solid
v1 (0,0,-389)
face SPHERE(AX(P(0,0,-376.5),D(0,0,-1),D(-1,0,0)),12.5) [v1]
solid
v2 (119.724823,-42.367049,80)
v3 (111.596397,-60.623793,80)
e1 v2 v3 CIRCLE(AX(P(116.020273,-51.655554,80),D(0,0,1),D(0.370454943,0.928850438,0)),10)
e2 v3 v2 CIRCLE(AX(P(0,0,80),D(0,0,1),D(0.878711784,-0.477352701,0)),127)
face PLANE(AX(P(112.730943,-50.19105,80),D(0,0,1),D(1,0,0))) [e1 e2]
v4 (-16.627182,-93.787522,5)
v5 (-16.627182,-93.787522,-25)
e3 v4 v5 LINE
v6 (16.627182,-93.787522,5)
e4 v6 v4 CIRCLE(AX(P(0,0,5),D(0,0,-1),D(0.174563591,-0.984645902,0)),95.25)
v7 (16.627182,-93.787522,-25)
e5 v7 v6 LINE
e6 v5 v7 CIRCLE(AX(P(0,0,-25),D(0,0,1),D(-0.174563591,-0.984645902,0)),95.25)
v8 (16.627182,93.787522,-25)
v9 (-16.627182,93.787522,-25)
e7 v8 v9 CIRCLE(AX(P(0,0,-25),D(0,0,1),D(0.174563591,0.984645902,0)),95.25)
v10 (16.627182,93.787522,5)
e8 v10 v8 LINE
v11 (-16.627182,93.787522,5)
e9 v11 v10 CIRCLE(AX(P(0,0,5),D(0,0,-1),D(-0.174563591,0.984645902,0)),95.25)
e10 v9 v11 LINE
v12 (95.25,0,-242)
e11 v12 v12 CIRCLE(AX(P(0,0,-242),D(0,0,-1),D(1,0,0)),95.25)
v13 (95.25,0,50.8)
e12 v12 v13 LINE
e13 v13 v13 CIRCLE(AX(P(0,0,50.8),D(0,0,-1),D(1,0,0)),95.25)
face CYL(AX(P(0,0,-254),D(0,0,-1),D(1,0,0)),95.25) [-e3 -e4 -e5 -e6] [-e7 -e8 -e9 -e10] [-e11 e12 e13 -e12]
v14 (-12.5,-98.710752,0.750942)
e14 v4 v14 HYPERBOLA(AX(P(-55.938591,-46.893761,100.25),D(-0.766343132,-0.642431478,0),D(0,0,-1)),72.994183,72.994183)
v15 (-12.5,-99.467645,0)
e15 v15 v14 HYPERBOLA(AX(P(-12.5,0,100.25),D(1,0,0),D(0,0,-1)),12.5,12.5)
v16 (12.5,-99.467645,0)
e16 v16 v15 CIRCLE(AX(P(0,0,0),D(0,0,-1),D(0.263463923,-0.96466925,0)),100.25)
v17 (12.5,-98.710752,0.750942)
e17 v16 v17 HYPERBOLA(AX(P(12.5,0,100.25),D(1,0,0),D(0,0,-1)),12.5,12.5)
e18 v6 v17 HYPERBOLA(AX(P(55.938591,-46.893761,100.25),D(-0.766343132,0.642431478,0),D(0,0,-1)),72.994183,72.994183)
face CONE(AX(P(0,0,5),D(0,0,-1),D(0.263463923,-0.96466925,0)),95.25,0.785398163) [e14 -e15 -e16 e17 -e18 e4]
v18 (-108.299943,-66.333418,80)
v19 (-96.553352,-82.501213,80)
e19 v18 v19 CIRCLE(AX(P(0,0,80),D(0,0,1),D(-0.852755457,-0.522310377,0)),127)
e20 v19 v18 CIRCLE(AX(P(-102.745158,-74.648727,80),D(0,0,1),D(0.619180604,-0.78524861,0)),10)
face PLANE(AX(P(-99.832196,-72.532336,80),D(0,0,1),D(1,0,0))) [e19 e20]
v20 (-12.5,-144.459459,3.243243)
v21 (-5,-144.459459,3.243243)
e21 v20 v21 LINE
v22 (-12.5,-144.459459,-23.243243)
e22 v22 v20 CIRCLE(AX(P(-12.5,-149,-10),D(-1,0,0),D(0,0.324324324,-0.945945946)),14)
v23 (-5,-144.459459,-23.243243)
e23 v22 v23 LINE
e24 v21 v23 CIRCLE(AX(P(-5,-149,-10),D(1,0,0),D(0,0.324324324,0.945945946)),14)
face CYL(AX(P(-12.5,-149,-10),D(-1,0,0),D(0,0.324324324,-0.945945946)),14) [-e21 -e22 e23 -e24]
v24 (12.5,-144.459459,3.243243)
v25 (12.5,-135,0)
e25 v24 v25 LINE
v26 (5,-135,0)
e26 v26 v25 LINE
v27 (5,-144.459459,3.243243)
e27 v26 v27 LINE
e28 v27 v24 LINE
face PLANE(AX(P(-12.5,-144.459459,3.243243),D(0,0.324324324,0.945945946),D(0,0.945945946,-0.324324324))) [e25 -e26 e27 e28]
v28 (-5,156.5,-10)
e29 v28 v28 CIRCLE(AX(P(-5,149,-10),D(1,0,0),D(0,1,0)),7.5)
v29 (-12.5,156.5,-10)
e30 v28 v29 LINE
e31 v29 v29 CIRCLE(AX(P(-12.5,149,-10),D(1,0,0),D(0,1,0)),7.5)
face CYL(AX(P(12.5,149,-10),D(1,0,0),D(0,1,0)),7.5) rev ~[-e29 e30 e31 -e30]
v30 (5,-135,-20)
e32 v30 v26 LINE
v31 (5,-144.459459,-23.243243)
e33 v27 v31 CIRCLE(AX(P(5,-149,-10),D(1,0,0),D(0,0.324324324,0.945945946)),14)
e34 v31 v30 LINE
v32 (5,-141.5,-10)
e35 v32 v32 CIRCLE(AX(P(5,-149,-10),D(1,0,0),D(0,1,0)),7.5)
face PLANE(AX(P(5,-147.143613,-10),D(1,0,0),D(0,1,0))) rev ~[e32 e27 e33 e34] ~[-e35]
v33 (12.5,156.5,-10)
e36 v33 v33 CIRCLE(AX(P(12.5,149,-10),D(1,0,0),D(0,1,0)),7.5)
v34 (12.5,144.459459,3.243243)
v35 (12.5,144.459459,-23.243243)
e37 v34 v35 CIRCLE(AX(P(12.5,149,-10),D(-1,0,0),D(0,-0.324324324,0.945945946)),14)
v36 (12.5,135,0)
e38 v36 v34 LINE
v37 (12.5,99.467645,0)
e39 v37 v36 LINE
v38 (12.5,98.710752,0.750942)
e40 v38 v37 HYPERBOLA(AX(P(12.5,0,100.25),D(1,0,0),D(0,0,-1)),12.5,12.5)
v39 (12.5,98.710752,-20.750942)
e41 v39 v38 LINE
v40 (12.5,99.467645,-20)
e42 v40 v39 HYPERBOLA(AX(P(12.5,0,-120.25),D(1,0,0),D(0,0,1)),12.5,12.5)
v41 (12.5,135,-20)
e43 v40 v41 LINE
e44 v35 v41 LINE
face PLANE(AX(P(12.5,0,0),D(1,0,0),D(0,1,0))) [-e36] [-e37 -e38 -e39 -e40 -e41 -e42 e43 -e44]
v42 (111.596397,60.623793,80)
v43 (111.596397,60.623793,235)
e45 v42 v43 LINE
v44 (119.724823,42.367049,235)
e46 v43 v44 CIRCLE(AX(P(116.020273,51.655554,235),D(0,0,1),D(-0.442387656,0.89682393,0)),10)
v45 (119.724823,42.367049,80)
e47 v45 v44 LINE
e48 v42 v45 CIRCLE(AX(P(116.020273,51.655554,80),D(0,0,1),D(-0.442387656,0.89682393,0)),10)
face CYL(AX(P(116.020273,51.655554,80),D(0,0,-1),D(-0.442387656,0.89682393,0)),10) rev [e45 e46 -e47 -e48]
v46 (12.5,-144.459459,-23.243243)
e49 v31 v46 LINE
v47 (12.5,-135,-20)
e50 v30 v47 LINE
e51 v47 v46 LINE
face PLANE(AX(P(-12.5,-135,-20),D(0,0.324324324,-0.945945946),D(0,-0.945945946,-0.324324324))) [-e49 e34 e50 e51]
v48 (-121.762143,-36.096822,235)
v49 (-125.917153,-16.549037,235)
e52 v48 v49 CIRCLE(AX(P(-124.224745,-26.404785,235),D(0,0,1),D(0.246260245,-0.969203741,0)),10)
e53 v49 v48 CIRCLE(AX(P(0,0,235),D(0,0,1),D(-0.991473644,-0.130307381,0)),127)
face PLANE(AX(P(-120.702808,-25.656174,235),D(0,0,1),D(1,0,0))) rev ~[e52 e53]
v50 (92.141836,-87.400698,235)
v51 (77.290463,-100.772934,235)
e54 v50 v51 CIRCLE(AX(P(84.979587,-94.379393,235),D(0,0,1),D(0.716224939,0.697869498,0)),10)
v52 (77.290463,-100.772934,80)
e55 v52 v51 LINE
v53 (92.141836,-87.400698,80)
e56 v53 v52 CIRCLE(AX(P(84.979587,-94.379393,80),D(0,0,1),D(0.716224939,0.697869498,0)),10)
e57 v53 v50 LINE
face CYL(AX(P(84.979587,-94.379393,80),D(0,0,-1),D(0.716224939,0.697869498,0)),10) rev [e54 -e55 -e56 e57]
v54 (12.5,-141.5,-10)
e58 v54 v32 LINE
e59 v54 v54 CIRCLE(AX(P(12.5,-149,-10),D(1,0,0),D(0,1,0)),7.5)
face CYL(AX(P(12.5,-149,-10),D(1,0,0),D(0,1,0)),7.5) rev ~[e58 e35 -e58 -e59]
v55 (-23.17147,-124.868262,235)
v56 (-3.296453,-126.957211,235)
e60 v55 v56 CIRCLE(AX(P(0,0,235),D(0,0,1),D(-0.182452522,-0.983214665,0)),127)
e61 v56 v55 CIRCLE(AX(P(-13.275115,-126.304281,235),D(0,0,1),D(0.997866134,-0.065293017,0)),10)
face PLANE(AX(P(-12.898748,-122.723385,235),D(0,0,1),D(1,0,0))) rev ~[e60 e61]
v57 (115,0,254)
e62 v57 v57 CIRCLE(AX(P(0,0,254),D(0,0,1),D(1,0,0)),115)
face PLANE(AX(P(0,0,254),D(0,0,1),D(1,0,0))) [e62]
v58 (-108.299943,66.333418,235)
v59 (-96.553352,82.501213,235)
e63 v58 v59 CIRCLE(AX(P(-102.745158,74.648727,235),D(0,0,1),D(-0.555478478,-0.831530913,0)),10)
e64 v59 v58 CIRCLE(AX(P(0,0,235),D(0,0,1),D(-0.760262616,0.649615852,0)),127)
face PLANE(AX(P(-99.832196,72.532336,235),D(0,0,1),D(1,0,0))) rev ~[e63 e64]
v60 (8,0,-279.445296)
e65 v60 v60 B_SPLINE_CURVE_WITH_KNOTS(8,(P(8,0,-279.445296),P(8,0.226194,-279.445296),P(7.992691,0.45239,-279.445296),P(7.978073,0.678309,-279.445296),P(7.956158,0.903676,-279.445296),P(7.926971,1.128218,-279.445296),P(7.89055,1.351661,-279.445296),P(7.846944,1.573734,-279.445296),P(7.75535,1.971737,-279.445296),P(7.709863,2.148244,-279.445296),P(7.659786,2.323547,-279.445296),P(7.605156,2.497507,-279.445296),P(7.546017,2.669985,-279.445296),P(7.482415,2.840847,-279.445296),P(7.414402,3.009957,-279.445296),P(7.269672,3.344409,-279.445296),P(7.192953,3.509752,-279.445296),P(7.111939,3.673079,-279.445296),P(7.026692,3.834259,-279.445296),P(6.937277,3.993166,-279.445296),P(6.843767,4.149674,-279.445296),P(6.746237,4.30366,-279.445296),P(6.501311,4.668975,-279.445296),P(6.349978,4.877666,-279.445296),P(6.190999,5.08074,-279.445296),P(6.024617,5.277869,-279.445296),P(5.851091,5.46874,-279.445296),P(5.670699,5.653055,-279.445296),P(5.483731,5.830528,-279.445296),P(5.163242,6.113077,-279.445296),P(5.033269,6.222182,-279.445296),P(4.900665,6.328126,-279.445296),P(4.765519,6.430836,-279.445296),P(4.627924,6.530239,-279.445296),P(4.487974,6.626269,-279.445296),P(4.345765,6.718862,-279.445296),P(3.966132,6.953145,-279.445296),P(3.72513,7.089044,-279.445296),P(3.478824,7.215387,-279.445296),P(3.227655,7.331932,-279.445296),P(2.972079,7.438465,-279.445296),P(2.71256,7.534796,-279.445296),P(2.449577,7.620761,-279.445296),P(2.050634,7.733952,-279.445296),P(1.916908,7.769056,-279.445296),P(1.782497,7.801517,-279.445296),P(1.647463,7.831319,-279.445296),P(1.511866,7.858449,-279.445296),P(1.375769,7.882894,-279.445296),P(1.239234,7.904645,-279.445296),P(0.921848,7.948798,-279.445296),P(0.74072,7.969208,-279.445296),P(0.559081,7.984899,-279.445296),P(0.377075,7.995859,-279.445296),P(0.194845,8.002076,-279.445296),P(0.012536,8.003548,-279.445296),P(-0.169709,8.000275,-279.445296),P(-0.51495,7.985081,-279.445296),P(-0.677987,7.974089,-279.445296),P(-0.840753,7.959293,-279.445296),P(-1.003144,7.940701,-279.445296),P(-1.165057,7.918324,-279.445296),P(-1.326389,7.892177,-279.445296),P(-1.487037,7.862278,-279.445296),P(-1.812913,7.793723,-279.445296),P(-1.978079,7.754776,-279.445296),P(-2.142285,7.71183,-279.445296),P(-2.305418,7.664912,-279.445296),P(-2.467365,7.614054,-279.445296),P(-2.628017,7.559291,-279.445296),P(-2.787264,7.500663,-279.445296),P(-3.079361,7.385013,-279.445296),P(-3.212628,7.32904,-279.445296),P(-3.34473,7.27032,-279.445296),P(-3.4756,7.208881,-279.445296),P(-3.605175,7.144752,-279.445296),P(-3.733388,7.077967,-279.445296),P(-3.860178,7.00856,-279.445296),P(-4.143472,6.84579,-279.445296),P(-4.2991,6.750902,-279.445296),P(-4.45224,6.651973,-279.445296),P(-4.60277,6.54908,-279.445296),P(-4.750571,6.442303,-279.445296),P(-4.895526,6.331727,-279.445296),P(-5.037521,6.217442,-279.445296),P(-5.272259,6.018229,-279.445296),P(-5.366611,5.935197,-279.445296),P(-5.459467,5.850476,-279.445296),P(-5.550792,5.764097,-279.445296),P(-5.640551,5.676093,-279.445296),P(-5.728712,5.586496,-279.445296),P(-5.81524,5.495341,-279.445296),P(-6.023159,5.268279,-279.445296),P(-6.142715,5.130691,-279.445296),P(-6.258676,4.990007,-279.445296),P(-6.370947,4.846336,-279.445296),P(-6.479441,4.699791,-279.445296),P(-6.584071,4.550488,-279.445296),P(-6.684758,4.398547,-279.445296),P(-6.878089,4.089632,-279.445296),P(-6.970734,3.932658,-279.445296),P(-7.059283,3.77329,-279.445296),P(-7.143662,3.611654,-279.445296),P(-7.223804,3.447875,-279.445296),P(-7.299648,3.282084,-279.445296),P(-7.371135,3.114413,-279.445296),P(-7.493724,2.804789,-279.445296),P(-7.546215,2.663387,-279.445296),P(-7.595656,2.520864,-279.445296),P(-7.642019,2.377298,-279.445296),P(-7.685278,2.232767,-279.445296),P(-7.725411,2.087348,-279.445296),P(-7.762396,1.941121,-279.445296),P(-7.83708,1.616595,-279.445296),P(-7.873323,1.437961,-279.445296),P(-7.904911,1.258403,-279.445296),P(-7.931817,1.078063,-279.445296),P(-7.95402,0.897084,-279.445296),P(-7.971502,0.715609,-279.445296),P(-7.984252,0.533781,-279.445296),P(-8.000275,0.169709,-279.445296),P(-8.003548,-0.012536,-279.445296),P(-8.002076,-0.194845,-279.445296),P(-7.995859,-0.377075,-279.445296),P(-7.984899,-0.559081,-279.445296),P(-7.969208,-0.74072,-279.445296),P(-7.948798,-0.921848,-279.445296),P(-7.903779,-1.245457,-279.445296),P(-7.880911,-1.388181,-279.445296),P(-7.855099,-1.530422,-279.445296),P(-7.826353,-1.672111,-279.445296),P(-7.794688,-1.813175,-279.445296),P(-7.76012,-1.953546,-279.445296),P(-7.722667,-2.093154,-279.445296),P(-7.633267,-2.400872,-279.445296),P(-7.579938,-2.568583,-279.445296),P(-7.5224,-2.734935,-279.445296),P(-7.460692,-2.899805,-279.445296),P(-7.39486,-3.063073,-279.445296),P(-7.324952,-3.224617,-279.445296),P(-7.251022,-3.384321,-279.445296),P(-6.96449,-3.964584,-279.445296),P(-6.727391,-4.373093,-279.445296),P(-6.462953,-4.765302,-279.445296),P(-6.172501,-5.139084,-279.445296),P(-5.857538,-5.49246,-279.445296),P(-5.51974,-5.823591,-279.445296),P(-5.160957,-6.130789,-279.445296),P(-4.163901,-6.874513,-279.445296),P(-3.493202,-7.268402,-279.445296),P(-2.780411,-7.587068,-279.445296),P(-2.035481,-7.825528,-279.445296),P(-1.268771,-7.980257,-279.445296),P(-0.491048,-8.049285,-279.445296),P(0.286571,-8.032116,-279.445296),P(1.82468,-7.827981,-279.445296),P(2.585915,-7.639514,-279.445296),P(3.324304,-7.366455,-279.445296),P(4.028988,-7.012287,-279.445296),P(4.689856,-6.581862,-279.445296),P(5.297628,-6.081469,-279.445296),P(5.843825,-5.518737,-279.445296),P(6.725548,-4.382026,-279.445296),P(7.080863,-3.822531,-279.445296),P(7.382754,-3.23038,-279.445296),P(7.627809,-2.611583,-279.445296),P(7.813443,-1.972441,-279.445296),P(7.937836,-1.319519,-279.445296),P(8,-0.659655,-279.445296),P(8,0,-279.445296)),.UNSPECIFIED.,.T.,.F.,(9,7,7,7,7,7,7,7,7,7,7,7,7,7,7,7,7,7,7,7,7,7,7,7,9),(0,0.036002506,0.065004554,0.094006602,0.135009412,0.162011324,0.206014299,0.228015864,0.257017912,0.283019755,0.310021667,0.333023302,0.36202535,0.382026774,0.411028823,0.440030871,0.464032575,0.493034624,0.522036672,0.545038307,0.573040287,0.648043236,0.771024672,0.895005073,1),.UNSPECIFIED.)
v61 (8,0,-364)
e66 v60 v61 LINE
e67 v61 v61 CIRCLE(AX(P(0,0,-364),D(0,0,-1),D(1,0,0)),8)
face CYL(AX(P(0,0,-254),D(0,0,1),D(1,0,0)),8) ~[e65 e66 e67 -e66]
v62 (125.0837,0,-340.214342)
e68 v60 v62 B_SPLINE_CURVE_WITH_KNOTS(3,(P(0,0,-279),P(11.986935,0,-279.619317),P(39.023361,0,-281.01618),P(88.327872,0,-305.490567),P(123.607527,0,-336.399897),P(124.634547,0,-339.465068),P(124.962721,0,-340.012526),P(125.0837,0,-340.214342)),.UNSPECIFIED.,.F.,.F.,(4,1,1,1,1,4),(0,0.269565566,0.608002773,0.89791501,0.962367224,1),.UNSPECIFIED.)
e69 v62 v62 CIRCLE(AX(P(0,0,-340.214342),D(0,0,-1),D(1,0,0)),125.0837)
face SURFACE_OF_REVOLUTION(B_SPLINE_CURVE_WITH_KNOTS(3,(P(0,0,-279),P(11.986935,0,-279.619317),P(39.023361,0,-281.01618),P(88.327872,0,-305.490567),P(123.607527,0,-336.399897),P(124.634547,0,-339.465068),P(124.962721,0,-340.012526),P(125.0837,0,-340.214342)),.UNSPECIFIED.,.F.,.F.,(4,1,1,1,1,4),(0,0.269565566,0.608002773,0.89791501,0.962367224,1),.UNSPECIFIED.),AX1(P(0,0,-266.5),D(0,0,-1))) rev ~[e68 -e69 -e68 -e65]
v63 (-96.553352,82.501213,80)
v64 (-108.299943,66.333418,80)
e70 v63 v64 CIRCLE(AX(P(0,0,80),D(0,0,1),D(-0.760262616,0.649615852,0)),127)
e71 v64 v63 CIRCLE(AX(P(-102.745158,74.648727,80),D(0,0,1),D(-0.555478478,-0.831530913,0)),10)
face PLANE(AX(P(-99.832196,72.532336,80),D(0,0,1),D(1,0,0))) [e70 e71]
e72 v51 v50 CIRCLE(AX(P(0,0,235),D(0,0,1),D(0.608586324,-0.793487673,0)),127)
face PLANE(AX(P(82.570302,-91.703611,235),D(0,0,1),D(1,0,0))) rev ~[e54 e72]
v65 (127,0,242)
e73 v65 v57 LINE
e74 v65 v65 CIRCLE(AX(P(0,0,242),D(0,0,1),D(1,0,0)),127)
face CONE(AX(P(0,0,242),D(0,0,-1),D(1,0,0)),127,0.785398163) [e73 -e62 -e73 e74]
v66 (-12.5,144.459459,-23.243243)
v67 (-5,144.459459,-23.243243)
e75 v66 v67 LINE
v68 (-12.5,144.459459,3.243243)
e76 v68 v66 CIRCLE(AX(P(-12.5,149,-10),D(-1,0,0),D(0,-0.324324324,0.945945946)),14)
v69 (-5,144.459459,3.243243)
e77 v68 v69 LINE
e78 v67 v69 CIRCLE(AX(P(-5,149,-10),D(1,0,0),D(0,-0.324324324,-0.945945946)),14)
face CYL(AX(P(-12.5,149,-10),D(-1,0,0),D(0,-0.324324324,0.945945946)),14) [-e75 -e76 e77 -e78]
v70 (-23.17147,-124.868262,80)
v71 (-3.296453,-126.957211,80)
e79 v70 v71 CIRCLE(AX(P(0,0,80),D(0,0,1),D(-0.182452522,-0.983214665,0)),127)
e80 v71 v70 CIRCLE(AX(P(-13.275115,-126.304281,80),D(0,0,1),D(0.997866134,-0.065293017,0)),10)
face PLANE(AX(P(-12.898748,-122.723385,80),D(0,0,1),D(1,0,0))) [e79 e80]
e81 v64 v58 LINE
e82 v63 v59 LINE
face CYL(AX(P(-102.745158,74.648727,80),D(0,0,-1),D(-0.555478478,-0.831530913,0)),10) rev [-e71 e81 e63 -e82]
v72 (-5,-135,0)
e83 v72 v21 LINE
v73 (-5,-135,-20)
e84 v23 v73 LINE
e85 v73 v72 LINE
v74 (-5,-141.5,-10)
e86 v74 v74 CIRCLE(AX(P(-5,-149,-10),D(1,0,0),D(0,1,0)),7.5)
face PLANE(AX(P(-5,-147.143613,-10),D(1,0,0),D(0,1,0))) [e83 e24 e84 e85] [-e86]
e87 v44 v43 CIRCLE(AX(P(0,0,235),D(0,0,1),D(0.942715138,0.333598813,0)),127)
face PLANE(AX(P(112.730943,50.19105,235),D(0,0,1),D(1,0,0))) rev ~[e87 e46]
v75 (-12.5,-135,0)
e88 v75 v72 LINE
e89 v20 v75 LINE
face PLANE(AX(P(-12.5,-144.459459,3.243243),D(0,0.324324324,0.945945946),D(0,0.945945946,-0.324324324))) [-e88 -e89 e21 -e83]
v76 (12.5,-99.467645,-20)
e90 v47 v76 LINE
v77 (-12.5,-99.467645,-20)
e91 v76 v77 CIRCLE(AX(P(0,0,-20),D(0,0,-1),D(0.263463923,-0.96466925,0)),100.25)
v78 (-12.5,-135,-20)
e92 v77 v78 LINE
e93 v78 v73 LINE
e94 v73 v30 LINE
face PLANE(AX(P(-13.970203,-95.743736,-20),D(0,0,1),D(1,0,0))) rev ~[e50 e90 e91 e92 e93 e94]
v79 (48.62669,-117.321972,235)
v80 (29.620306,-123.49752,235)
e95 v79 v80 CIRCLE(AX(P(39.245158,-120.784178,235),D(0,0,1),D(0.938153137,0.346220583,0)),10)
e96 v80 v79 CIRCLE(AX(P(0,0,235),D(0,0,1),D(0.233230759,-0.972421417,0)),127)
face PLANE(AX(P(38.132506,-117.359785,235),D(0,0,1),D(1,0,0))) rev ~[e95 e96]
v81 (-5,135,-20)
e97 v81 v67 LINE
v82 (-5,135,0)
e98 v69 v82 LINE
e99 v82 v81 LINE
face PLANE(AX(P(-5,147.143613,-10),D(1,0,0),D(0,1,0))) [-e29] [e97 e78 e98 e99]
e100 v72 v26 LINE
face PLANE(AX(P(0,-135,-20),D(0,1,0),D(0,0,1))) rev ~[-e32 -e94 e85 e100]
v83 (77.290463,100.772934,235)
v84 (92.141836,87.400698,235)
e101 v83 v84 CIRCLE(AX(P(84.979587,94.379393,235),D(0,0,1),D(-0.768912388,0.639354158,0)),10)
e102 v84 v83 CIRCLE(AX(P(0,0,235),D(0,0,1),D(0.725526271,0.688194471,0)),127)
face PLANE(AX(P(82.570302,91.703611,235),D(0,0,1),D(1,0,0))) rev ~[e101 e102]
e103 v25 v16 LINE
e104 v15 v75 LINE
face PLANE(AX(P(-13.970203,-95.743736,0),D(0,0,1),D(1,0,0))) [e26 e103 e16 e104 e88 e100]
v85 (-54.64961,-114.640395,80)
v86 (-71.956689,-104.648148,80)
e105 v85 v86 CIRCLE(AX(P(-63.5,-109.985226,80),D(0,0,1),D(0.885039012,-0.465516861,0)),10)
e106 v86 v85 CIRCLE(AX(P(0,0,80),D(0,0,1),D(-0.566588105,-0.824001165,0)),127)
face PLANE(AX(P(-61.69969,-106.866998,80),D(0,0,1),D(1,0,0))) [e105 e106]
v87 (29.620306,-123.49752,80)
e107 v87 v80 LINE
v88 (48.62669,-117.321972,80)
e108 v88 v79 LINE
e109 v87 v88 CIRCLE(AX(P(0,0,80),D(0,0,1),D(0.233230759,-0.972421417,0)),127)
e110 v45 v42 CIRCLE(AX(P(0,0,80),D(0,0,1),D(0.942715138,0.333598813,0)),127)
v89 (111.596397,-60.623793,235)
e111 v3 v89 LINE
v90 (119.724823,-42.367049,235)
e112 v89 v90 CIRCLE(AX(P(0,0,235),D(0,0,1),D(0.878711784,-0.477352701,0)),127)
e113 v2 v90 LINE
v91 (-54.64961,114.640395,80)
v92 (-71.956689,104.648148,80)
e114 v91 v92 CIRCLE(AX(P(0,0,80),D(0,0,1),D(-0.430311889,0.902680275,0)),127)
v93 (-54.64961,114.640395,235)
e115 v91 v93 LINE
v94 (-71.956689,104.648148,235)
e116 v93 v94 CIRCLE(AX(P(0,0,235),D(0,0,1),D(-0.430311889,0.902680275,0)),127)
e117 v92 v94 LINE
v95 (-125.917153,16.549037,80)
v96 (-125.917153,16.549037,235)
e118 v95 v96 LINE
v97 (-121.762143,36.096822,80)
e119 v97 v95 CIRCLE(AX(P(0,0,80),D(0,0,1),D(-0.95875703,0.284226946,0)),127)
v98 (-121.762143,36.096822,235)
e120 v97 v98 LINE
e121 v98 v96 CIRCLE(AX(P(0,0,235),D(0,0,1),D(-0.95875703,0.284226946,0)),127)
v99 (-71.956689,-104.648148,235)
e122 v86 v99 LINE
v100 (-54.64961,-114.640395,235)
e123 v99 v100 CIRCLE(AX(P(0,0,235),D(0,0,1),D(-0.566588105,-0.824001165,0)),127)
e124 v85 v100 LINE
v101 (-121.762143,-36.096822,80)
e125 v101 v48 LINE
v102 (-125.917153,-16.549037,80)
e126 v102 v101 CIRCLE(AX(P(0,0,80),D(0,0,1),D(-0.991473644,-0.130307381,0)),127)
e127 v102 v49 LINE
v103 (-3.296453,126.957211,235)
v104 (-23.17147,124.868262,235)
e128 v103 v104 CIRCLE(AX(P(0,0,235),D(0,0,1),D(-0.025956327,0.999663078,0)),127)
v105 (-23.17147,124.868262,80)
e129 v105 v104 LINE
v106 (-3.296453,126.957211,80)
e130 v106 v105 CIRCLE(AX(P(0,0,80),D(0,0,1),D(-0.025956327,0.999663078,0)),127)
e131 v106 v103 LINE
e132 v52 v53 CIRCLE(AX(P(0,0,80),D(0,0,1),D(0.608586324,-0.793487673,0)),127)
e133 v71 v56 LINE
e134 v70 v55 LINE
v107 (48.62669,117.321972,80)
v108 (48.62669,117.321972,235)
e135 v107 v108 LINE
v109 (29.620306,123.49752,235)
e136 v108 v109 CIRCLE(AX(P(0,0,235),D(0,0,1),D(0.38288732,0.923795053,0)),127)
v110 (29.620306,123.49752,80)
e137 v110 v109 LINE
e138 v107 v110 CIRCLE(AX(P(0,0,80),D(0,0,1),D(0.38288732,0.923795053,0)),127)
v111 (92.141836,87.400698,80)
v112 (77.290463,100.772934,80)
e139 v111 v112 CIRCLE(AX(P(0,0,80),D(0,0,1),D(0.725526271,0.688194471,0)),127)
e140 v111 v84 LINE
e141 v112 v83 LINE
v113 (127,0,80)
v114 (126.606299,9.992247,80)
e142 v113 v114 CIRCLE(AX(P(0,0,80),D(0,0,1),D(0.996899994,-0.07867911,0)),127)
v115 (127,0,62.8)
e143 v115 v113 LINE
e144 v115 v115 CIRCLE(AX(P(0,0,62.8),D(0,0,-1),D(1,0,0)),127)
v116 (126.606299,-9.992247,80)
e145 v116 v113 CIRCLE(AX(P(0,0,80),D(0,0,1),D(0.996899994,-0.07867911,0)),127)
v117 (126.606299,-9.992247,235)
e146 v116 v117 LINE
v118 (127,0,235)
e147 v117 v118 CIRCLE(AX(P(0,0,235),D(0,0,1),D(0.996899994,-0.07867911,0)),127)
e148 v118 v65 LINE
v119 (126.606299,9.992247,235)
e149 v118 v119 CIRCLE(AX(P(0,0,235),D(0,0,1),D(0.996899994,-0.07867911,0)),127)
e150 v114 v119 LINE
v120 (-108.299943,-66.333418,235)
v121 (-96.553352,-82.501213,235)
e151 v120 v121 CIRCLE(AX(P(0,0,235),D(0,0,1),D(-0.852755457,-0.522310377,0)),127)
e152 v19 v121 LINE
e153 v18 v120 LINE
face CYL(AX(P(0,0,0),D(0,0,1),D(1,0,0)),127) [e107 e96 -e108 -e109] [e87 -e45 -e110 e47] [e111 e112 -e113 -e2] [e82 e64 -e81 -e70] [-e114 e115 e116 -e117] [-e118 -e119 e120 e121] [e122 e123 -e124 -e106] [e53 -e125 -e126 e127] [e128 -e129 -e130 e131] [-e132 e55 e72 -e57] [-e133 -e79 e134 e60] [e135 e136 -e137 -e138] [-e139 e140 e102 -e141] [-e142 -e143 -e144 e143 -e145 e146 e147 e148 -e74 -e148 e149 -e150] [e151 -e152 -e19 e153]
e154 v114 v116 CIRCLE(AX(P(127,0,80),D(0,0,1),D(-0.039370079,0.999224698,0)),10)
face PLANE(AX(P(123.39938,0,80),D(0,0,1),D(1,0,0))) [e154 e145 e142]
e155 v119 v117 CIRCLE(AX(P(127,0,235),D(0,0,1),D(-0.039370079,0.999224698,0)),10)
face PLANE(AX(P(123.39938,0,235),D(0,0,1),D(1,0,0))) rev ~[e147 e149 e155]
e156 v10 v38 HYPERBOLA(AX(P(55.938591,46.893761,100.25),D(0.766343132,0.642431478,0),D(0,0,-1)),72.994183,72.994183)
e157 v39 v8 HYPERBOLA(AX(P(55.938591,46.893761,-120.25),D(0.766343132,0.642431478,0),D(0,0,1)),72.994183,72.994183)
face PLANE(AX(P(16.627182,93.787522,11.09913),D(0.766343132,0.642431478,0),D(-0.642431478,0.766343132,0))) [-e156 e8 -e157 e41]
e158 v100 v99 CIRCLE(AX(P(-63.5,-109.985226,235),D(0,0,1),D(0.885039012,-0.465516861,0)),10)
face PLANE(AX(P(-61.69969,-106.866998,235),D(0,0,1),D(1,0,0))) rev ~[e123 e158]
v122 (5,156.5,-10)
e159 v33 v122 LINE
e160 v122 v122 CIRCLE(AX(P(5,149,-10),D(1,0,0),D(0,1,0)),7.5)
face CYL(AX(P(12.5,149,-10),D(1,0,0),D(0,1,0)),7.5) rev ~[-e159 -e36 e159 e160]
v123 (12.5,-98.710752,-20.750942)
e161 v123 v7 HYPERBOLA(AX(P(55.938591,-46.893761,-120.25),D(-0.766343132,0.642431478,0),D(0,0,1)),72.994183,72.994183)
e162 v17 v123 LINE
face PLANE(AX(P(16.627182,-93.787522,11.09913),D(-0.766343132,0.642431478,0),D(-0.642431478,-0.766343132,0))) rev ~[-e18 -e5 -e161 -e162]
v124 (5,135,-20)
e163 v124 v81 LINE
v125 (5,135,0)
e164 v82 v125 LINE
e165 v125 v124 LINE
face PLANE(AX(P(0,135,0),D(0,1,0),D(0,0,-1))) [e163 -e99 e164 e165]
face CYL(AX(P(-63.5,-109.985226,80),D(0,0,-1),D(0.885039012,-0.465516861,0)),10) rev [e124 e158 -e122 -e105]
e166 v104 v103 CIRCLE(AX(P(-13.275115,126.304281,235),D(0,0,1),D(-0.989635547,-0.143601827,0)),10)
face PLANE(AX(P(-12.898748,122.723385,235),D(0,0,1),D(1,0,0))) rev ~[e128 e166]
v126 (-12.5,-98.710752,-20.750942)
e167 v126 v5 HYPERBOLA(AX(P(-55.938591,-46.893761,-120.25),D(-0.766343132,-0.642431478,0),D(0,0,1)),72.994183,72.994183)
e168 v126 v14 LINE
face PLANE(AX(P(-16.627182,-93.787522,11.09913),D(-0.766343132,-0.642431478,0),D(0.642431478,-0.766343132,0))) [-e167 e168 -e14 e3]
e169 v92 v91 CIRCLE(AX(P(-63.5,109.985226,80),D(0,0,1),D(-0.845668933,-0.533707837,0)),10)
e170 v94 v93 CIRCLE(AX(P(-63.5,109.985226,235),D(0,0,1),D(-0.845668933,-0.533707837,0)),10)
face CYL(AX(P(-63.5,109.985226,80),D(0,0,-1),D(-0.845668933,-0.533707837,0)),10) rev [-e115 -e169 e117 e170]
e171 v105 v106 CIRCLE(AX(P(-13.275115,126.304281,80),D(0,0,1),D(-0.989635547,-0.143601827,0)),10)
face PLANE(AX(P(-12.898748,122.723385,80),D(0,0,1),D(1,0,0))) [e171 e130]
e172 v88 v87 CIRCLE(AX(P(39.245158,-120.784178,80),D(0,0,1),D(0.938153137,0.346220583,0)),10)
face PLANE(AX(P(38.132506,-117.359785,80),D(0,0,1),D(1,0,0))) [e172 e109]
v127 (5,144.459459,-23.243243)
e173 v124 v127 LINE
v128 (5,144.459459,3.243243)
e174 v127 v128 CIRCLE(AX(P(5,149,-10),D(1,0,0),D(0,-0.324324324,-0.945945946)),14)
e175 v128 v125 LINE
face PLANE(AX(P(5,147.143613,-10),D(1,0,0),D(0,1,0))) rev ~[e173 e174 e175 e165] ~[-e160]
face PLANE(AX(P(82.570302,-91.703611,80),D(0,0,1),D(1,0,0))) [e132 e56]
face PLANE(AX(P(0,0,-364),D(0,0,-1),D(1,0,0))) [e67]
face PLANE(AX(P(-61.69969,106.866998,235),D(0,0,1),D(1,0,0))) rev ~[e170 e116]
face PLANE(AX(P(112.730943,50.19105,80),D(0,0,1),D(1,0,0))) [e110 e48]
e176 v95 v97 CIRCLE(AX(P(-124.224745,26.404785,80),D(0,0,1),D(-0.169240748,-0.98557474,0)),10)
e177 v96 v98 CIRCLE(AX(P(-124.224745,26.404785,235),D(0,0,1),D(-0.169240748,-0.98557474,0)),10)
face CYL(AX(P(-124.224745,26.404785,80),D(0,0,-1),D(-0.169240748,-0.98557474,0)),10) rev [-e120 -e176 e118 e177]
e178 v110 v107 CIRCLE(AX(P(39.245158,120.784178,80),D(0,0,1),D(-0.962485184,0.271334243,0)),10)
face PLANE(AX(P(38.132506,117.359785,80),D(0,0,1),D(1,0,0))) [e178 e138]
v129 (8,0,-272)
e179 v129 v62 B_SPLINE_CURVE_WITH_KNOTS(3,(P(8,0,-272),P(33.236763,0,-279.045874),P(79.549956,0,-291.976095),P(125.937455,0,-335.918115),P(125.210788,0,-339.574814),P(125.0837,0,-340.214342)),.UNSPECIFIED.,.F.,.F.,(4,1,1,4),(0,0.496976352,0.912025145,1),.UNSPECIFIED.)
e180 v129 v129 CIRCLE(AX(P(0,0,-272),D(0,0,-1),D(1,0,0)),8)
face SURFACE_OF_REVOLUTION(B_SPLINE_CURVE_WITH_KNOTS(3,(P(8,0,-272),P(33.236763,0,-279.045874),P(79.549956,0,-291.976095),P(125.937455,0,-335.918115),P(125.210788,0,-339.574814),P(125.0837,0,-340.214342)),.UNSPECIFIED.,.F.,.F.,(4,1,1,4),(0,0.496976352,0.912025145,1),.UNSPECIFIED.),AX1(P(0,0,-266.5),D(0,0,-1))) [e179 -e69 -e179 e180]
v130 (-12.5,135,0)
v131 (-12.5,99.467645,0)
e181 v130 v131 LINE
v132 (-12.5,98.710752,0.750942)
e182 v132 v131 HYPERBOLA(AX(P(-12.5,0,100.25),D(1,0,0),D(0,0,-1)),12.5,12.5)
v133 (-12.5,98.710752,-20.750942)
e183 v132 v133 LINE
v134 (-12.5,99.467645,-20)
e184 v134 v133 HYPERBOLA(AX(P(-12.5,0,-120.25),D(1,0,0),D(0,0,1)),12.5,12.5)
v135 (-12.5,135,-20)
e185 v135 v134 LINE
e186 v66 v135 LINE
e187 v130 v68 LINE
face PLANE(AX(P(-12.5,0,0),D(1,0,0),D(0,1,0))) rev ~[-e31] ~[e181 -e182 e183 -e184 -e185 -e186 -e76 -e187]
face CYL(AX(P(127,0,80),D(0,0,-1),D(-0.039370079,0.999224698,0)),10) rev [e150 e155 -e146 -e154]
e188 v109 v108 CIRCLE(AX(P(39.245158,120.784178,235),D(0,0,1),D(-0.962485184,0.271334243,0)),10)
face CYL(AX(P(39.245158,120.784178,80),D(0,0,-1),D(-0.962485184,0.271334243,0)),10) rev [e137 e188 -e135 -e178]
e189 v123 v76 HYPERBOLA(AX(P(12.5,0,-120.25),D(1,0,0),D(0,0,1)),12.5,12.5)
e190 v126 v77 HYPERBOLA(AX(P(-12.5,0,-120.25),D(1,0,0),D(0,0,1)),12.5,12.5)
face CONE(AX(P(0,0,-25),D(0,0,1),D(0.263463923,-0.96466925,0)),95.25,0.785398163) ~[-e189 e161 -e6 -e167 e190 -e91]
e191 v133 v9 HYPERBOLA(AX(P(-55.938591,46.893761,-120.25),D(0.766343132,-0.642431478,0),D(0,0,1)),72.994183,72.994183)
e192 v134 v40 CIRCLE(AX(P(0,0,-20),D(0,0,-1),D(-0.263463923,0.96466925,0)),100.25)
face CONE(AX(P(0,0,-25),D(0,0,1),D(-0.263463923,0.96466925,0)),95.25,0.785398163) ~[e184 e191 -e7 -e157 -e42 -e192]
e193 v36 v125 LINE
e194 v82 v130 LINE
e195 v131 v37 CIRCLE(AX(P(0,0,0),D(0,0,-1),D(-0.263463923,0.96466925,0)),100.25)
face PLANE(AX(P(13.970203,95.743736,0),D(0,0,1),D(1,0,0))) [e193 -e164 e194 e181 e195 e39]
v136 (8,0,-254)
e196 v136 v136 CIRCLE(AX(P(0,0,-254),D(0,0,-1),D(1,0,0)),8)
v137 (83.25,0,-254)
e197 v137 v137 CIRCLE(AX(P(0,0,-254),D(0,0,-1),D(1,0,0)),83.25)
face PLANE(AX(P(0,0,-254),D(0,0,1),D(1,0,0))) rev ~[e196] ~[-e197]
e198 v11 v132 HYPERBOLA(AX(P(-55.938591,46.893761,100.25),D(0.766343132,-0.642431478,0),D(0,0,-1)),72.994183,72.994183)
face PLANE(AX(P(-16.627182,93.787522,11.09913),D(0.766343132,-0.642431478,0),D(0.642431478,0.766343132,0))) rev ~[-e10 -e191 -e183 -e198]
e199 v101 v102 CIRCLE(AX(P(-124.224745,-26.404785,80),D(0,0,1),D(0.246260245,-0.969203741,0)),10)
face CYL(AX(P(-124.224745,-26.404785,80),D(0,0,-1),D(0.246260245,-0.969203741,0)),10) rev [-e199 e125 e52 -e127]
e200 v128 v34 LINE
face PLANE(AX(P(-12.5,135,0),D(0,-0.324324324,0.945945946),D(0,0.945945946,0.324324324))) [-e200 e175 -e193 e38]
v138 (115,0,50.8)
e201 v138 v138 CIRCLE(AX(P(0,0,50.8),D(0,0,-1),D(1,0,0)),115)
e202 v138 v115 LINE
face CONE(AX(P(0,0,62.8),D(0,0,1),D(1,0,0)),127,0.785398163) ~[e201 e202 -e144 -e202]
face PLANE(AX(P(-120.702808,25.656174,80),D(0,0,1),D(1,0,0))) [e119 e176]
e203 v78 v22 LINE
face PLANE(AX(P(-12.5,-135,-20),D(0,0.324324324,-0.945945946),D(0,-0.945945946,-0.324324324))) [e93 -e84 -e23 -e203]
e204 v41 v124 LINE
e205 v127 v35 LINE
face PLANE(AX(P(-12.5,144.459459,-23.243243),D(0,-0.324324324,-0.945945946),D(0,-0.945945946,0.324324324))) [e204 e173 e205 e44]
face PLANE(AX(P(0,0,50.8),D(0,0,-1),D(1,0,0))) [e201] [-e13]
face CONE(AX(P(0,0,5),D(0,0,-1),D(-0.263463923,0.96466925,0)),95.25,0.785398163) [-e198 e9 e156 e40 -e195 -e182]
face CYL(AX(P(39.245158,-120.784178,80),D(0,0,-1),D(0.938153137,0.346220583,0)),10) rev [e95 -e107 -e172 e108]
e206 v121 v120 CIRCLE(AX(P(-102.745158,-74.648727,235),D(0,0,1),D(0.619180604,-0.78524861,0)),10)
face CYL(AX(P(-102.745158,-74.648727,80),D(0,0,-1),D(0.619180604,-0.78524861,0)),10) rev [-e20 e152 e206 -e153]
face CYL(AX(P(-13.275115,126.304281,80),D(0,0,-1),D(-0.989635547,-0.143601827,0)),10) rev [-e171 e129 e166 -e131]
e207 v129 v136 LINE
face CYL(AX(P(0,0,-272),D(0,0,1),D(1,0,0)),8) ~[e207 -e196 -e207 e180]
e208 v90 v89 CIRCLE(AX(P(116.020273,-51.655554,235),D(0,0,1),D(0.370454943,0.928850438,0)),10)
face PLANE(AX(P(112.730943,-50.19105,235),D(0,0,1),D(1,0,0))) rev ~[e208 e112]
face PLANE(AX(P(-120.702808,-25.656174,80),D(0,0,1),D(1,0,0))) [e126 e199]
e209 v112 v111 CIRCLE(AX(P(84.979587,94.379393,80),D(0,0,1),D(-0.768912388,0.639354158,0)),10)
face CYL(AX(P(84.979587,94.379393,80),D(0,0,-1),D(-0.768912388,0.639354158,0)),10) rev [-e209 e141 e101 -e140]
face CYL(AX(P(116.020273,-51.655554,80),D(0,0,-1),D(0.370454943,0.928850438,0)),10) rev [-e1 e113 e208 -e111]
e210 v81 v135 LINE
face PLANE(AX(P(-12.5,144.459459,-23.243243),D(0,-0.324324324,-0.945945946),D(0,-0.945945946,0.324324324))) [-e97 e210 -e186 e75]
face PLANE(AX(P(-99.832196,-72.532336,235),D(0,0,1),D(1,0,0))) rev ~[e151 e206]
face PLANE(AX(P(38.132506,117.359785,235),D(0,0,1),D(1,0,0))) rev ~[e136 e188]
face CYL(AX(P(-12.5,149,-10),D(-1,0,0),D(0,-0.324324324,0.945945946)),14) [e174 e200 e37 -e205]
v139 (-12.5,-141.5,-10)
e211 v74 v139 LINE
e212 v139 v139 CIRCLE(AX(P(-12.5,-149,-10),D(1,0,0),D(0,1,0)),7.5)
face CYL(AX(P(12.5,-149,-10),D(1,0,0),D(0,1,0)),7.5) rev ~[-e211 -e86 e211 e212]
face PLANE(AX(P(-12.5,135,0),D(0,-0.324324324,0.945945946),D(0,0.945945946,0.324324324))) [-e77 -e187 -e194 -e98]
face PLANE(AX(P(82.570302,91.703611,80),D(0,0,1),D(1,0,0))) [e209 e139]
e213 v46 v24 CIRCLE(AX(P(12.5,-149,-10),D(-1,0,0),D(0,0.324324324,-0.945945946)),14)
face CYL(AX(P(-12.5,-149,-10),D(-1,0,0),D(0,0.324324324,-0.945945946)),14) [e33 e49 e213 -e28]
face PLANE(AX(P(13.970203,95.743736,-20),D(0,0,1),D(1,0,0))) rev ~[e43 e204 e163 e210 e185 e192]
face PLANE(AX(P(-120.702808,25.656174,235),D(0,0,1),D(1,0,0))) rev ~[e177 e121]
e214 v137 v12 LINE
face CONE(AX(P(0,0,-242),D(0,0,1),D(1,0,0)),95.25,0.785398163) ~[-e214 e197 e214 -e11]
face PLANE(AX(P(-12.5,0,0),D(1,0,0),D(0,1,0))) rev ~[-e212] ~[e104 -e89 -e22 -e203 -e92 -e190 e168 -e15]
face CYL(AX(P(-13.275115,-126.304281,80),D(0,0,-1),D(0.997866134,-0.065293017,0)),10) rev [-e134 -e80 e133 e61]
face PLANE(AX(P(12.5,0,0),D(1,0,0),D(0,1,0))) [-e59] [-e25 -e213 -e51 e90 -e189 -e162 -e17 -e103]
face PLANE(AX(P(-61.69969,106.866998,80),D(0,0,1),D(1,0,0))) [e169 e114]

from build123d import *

# Parameters (mm, degrees)
F0_R           = 127
F1_DEPTH       = 254
F2_R           = 127
F2_R_2         = 95.25
F3_DEPTH       = 304.8
F6_R           = 8
F7_DEPTH       = 110
F10_SIZE       = 12
F13_DEPTH      = 155
F15_DEPTH      = 20
F17_DEPTH      = 25
F18_T1_DEPTH   = 20
F18_T6_ANGLE   = 30.5513976385
F18_T12_ANGLE  = 30.5513976385
F18_T18_ANGLE  = 30.5513976385
F18_T24_ANGLE  = 30.5513976385
F18_T31_ANGLE  = 30.5513976385
F18_T35_DEPTH  = 31.0991303205
F18_T42_DEPTH  = 31.0991303205
F18_T46_ANGLE  = 30.5513976385
F18_T53_DEPTH  = 31.0991303205
F18_T57_ANGLE  = 30.5513976385
F18_T64_DEPTH  = 31.0991303205
F18_T68_ANGLE  = 30.5513976385
F18_T75_ANGLE  = 30.5513976385
F18_T79_DEPTH  = 31.0991303205
F18_T86_DEPTH  = 31.0991303205
F18_T90_ANGLE  = 30.5513976385
F18_T97_DEPTH  = 31.0991303205
F18_T101_ANGLE = 30.5513976385
F18_T108_DEPTH = 31.0991303205
F18_T112_ANGLE = 30.5513976385
F19_R          = 7.5
F20_DEPTH      = 25
F23_DEPTH      = 5


# Not quite as in the source:
# - a fillet or chamfer that OpenCascade refuses, or shapes differently, is made with other operations: its cross-section is extruded or revolved along the edge and cut away or added


with BuildPart() as f1:
    # F0 (on Top) → F1 (new body, symmetric)
    with BuildSketch(Plane.XY):
        Circle(F0_R)
    extrude(amount=F1_DEPTH, both=True)

    # F2 (on face) → F3 (cut)
    with BuildSketch(Plane(origin=(0, 0, -254), x_dir=(1, 0, 0), z_dir=(0, 0, -1))):
        Circle(F2_R)
        Circle(F2_R_2, mode=Mode.SUBTRACT)
    extrude(amount=-F3_DEPTH, mode=Mode.SUBTRACT)

    # F4 (on Front) → F5 (revolve)
    with BuildSketch(Plane.XZ):
        with BuildLine():
            Line((8, -272), (8, -254))
            Line((8, -254), (0, -254))
            Line((0, -254), (0, -279))
            add(Edge.make_bspline(
                [(0, -279), (11.9869346113, -279.619316661), (39.0233605765, -281.0161799623), (88.3278716399, -305.4905672545), (123.6075273001, -336.3998966271), (124.6345471897, -339.4650682793), (124.962721218, -340.0125261312), (125.0836998224, -340.2143418789)],
                knots=[0, 0, 0, 0, 0.2695655664, 0.6080027726, 0.8979150102, 0.9623672243, 1, 1, 1, 1], degree=3))
            add(Edge.make_bspline(
                [(8, -272), (33.2367625522, -279.0458738752), (79.549956163, -291.9760950264), (125.9374548971, -335.9181149736), (125.2107880958, -339.5748141321), (125.0836998224, -340.2143418789)],
                knots=[0, 0, 0, 0, 0.4969763521, 0.9120251445, 1, 1, 1, 1], degree=3))
        make_face()
    revolve(axis=Axis((0, 0, -266.5), (0, 0, -1)))

    # F6 (on face) → F7 (join)
    with BuildSketch(Plane(origin=(0, 0, -254), x_dir=(1, 0, 0), z_dir=(0, 0, -1))):
        Circle(F6_R)
    extrude(amount=F7_DEPTH)

    # F10
    f10_edges = [f1.edges().sort_by_distance(p)[0] for p in [
        (-95.25, 0, -254),
        (-127, 0, 254),
        (-127, 0, 50.8),
    ]]
    chamfer(f10_edges, length=F10_SIZE)

    # F12 (on offset) → F13 (cut)
    with BuildSketch(Plane.XY.offset(80)):
        with BuildLine():
            ThreePointArc((111.5963965616, 60.6237929733), (106.8848185442, 47.5881872399), (119.7248225476, 42.3670492946))
            ThreePointArc((119.7248225476, 42.3670492946), (116.0202731206, 51.6555536706), (111.5963965616, 60.6237929733))
        make_face()
        with BuildLine():
            ThreePointArc((126.6062992126, -9.992246979), (127, 0), (126.6062992126, 9.992246979))
            ThreePointArc((126.6062992126, 9.992246979), (117, 0), (126.6062992126, -9.992246979))
        make_face()
        with BuildLine():
            ThreePointArc((92.1418363983, 87.4006978527), (84.9795870076, 94.3793928356), (77.2904631236, 100.7729344127))
            ThreePointArc((77.2904631236, 100.7729344127), (78.288280944, 86.9479445809), (92.1418363983, 87.4006978527))
        make_face()
        with BuildLine():
            ThreePointArc((48.6266896535, 117.3219717416), (39.2451582856, 120.7841775695), (29.6203064498, 123.4975199987))
            ThreePointArc((29.6203064498, 123.4975199987), (36.1549883419, 111.2736124065), (48.6266896535, 117.3219717416))
        make_face()
        with BuildLine():
            ThreePointArc((-3.2964534921, 126.9572108798), (-13.275114835, 126.3042807118), (-23.1714703013, 124.8682624372))
            ThreePointArc((-23.1714703013, 124.8682624372), (-12.2298302023, 116.3590617581), (-3.2964534921, 126.9572108798))
        make_face()
        with BuildLine():
            ThreePointArc((-54.6496098816, 114.6403948868), (-63.5, 109.9852262806), (-71.956689331, 104.6481479077))
            ThreePointArc((-71.956689331, 104.6481479077), (-58.5, 101.3249722428), (-54.6496098816, 114.6403948868))
        make_face()
        with BuildLine():
            ThreePointArc((-96.5533522464, 82.5012131425), (-102.7451582856, 74.6487270411), (-108.2999430695, 66.3334179065))
            ThreePointArc((-108.2999430695, 66.3334179065), (-94.6549883419, 68.7708745182), (-96.5533522464, 82.5012131425))
        make_face()
        with BuildLine():
            ThreePointArc((-121.7621428481, 36.096822146), (-124.2247452932, 26.4047847339), (-125.9171527771, 16.549037329))
            ThreePointArc((-125.9171527771, 16.549037329), (-114.4432692859, 24.3256678257), (-121.7621428481, 36.096822146))
        make_face()
        with BuildLine():
            ThreePointArc((-125.9171527771, -16.549037329), (-124.2247452932, -26.4047847339), (-121.7621428481, -36.096822146))
            ThreePointArc((-121.7621428481, -36.096822146), (-114.4432692859, -24.3256678257), (-125.9171527771, -16.549037329))
        make_face()
        with BuildLine():
            ThreePointArc((-108.2999430695, -66.3334179065), (-102.7451582856, -74.6487270411), (-96.5533522464, -82.5012131425))
            ThreePointArc((-96.5533522464, -82.5012131425), (-94.6549883419, -68.7708745182), (-108.2999430695, -66.3334179065))
        make_face()
        with BuildLine():
            ThreePointArc((-71.956689331, -104.6481479077), (-63.5, -109.9852262806), (-54.6496098816, -114.6403948868))
            ThreePointArc((-54.6496098816, -114.6403948868), (-58.5, -101.3249722428), (-71.956689331, -104.6481479077))
        make_face()
        with BuildLine():
            ThreePointArc((-23.1714703013, -124.8682624372), (-13.275114835, -126.3042807118), (-3.2964534921, -126.9572108798))
            ThreePointArc((-3.2964534921, -126.9572108798), (-12.2298302023, -116.3590617581), (-23.1714703013, -124.8682624372))
        make_face()
        with BuildLine():
            ThreePointArc((29.6203064498, -123.4975199987), (39.2451582856, -120.7841775695), (48.6266896535, -117.3219717416))
            ThreePointArc((48.6266896535, -117.3219717416), (36.1549883419, -111.2736124065), (29.6203064498, -123.4975199987))
        make_face()
        with BuildLine():
            ThreePointArc((77.2904631236, -100.7729344127), (84.9795870076, -94.3793928356), (92.1418363983, -87.4006978527))
            ThreePointArc((92.1418363983, -87.4006978527), (78.288280944, -86.9479445809), (77.2904631236, -100.7729344127))
        make_face()
        with BuildLine():
            ThreePointArc((111.5963965616, -60.6237929733), (116.0202731206, -51.6555536706), (119.7248225476, -42.3670492946))
            ThreePointArc((119.7248225476, -42.3670492946), (106.8848185442, -47.5881872399), (111.5963965616, -60.6237929733))
        make_face()
    extrude(amount=F13_DEPTH, mode=Mode.SUBTRACT)

    # F14 (on Top) → F15 (join)
    with BuildSketch(Plane.XY):
        with BuildLine():
            ThreePointArc((-12.5, 94.1740410092), (0, 95), (12.5, 94.1740410092))
            Line((12.5, 94.1740410092), (12.5, 135))
            Line((12.5, 135), (-12.5, 135))
            Line((-12.5, 135), (-12.5, 94.1740410092))
        make_face()
        with BuildLine():
            ThreePointArc((12.5, -94.1740410092), (0, -95), (-12.5, -94.1740410092))
            Line((-12.5, -94.1740410092), (-12.5, -135))
            Line((-12.5, -135), (12.5, -135))
            Line((12.5, -135), (12.5, -94.1740410092))
        make_face()
    extrude(amount=-F15_DEPTH)

    # F16 (on face) → F17 (join, through all)
    with BuildSketch(Plane(origin=(-12.5, 0, 0), x_dir=(0, -1, 0), z_dir=(-1, 0, 0))):
        with BuildLine():
            Line((135, -20), (144.4594594595, -23.2432432432))
            ThreePointArc((144.4594594595, -23.2432432432), (163, -10), (144.4594594595, 3.2432432432))
            Line((144.4594594595, 3.2432432432), (135, 0))
            Line((135, 0), (135, -20))
        make_face()
        with BuildLine():
            Line((-144.4594594595, -23.2432432432), (-135, -20))
            Line((-135, -20), (-135, 0))
            Line((-135, 0), (-144.4594594595, 3.2432432432))
            ThreePointArc((-144.4594594595, 3.2432432432), (-163, -10), (-144.4594594595, -23.2432432432))
        make_face()
    extrude(amount=-F17_DEPTH)

    # F18: chamfer of 5 on 8 edges, made by hand

    # F18_s2 → F18_t1 (join)
    with BuildSketch(Plane.XY.offset(-20)):
        with BuildLine():
            Line((-16.6271820449, -93.7875221831), (-12.5, -98.710751694))
            Line((-12.5, -98.710751694), (-12.5, -94.4262278183))
            ThreePointArc((-12.5, -94.4262278183), (-14.6414795672, -94.1179556519), (-16.6271820449, -93.7875221831))
        make_face()
        with BuildLine():
            Line((16.6271820449, -93.7875221831), (12.5, -98.710751694))
            Line((12.5, -98.710751694), (12.5, -94.4262278183))
            ThreePointArc((12.5, -94.4262278183), (14.6414795672, -94.1179556519), (16.6271820449, -93.7875221831))
        make_face()
        with BuildLine():
            Line((-16.6271820449, 93.7875221831), (-12.5, 98.710751694))
            Line((-12.5, 98.710751694), (-12.5, 94.4262278183))
            ThreePointArc((-12.5, 94.4262278183), (-14.6414795672, 94.1179556519), (-16.6271820449, 93.7875221831))
        make_face()
        with BuildLine():
            Line((16.6271820449, 93.7875221831), (12.5, 98.710751694))
            Line((12.5, 98.710751694), (12.5, 94.4262278183))
            ThreePointArc((12.5, 94.4262278183), (14.6414795672, 94.1179556519), (16.6271820449, 93.7875221831))
        make_face()
    extrude(amount=F18_T1_DEPTH)


with BuildPart() as f9:
    # F8 (on Front) → F9 (revolve)
    with BuildSketch(Plane.XZ):
        with BuildLine():
            Line((0, -389), (0, -364))
            ThreePointArc((0, -364), (-12.5, -376.5), (0, -389))
        make_face()
    revolve(axis=Axis((0, 0, -376.5), (0, 0, -1)))


with BuildPart() as f18_tool4:
    # F18_s5 → F18_t6 (revolve)
    with BuildSketch(Plane(origin=(0, 0, 0), x_dir=(0, 0, 1), z_dir=(0.9646692497, 0.2634639231, 0))):
        Polygon((-25, 95.25), (-20, 100.25), (-20, 95.25), align=None)
    revolve(axis=Axis((0, 0, -20), (0, 0, -1)), revolution_arc=F18_T6_ANGLE)

    split(bisect_by=Plane.YZ.offset(-12.5), keep=Keep.TOP)

    split(bisect_by=Plane.YZ.offset(12.5), keep=Keep.BOTTOM)


with BuildPart() as f1_1:
    add(f1.part)

    # F18_t3: union F18_tool4
    add(f18_tool4.part)


with BuildPart() as f18_tool10:
    # F18_s11 → F18_t12 (revolve)
    with BuildSketch(Plane(origin=(0, 0, 0), x_dir=(0, 0, 1), z_dir=(0.9646692497, 0.2634639231, 0))):
        Polygon((5, 95.25), (0, 100.25), (0, 95.25), align=None)
    revolve(axis=Axis((0, 0, 0), (0, 0, -1)), revolution_arc=F18_T12_ANGLE)

    split(bisect_by=Plane.YZ.offset(-12.5), keep=Keep.TOP)

    split(bisect_by=Plane.YZ.offset(12.5), keep=Keep.BOTTOM)


with BuildPart() as f1_2:
    add(f1_1.part)

    # F18_t9: union F18_tool10
    add(f18_tool10.part)


with BuildPart() as f18_tool16:
    # F18_s17 → F18_t18 (revolve)
    with BuildSketch(Plane(origin=(0, 0, 0), x_dir=(0, 0, 1), z_dir=(-0.9646692497, -0.2634639231, 0))):
        Polygon((-25, 95.25), (-20, 100.25), (-20, 95.25), align=None)
    revolve(axis=Axis((0, 0, -20), (0, 0, -1)), revolution_arc=F18_T18_ANGLE)

    split(bisect_by=Plane.YZ.offset(12.5), keep=Keep.BOTTOM)

    split(bisect_by=Plane.YZ.offset(-12.5), keep=Keep.TOP)


with BuildPart() as f1_3:
    add(f1_2.part)

    # F18_t15: union F18_tool16
    add(f18_tool16.part)


with BuildPart() as f18_tool22:
    # F18_s23 → F18_t24 (revolve)
    with BuildSketch(Plane(origin=(0, 0, 0), x_dir=(0, 0, 1), z_dir=(-0.9646692497, -0.2634639231, 0))):
        Polygon((5, 95.25), (0, 100.25), (0, 95.25), align=None)
    revolve(axis=Axis((0, 0, 0), (0, 0, -1)), revolution_arc=F18_T24_ANGLE)

    split(bisect_by=Plane.YZ.offset(12.5), keep=Keep.BOTTOM)

    split(bisect_by=Plane.YZ.offset(-12.5), keep=Keep.TOP)


with BuildPart() as f1_4:
    add(f1_3.part)

    # F18_t21: union F18_tool22
    add(f18_tool22.part)


with BuildPart() as f18_tool29:
    # F18_s30 → F18_t31 (revolve)
    with BuildSketch(Plane(origin=(0, 0, 0), x_dir=(0, 0, 1), z_dir=(0.9646692497, 0.2634639231, 0))):
        Polygon((-25, 95.25), (-20, 100.25), (-20, 95.25), align=None)
    revolve(axis=Axis((0, 0, -20), (0, 0, -1)), revolution_arc=F18_T31_ANGLE)

    split(bisect_by=Plane.YZ.offset(12.5), keep=Keep.TOP)


with BuildPart() as f18_tool33:
    # F18_s34 → F18_t35 (new body)
    with BuildSketch(Plane.XY):
        with BuildLine():
            Line((16.6271820449, -93.7875221831), (12.5, -98.710751694))
            Line((12.5, -98.710751694), (12.5, -94.4262278183))
            ThreePointArc((12.5, -94.4262278183), (14.6414795672, -94.1179556519), (16.6271820449, -93.7875221831))
        make_face()
    extrude(amount=-F18_T35_DEPTH)

    split(bisect_by=Plane.XY.offset(-20), keep=Keep.BOTTOM)


with BuildPart() as f18_tool29_1:
    add(f18_tool29.part)

    # F18_t37: intersect F18_tool33
    add(f18_tool33.part, mode=Mode.INTERSECT)


with BuildPart() as f1_5:
    add(f1_4.part)

    # F18_t27: union F18_tool29
    add(f18_tool29_1.part)


with BuildPart() as f18_tool40:
    # F18_s41 → F18_t42 (new body)
    with BuildSketch(Plane.XY):
        with BuildLine():
            Line((-16.6271820449, -93.7875221831), (-12.5, -98.710751694))
            Line((-12.5, -98.710751694), (-12.5, -94.4262278183))
            ThreePointArc((-12.5, -94.4262278183), (-14.6414795672, -94.1179556519), (-16.6271820449, -93.7875221831))
        make_face()
    extrude(amount=-F18_T42_DEPTH)

    split(bisect_by=Plane.XY.offset(-20), keep=Keep.BOTTOM)


with BuildPart() as f18_tool44:
    # F18_s45 → F18_t46 (revolve)
    with BuildSketch(Plane(origin=(0, 0, 0), x_dir=(0, 0, 1), z_dir=(0.9646692497, 0.2634639231, 0))):
        Polygon((-25, 95.25), (-20, 100.25), (-20, 95.25), align=None)
    revolve(axis=Axis((0, 0, -20), (0, 0, -1)), revolution_arc=F18_T46_ANGLE)

    split(bisect_by=Plane.YZ.offset(-12.5), keep=Keep.BOTTOM)


with BuildPart() as f18_tool40_1:
    add(f18_tool40.part)

    # F18_t48: intersect F18_tool44
    add(f18_tool44.part, mode=Mode.INTERSECT)


with BuildPart() as f1_6:
    add(f1_5.part)

    # F18_t38: union F18_tool40
    add(f18_tool40_1.part)


with BuildPart() as f18_tool51:
    # F18_s52 → F18_t53 (new body)
    with BuildSketch(Plane.XY.offset(11.0991303205)):
        with BuildLine():
            Line((-16.6271820449, -93.7875221831), (-12.5, -98.710751694))
            Line((-12.5, -98.710751694), (-12.5, -94.4262278183))
            ThreePointArc((-12.5, -94.4262278183), (-14.6414795672, -94.1179556519), (-16.6271820449, -93.7875221831))
        make_face()
    extrude(amount=-F18_T53_DEPTH)

    split(bisect_by=Plane.XY, keep=Keep.TOP)


with BuildPart() as f18_tool55:
    # F18_s56 → F18_t57 (revolve)
    with BuildSketch(Plane(origin=(0, 0, 0), x_dir=(0, 0, 1), z_dir=(0.9646692497, 0.2634639231, 0))):
        Polygon((5, 95.25), (0, 100.25), (0, 95.25), align=None)
    revolve(axis=Axis((0, 0, 0), (0, 0, -1)), revolution_arc=F18_T57_ANGLE)

    split(bisect_by=Plane.YZ.offset(-12.5), keep=Keep.BOTTOM)


with BuildPart() as f18_tool51_1:
    add(f18_tool51.part)

    # F18_t59: intersect F18_tool55
    add(f18_tool55.part, mode=Mode.INTERSECT)


with BuildPart() as f1_7:
    add(f1_6.part)

    # F18_t49: union F18_tool51
    add(f18_tool51_1.part)


with BuildPart() as f18_tool62:
    # F18_s63 → F18_t64 (new body)
    with BuildSketch(Plane.XY.offset(11.0991303205)):
        with BuildLine():
            Line((16.6271820449, -93.7875221831), (12.5, -98.710751694))
            Line((12.5, -98.710751694), (12.5, -94.4262278183))
            ThreePointArc((12.5, -94.4262278183), (14.6414795672, -94.1179556519), (16.6271820449, -93.7875221831))
        make_face()
    extrude(amount=-F18_T64_DEPTH)

    split(bisect_by=Plane.XY, keep=Keep.TOP)


with BuildPart() as f18_tool66:
    # F18_s67 → F18_t68 (revolve)
    with BuildSketch(Plane(origin=(0, 0, 0), x_dir=(0, 0, 1), z_dir=(0.9646692497, 0.2634639231, 0))):
        Polygon((5, 95.25), (0, 100.25), (0, 95.25), align=None)
    revolve(axis=Axis((0, 0, 0), (0, 0, -1)), revolution_arc=F18_T68_ANGLE)

    split(bisect_by=Plane.YZ.offset(12.5), keep=Keep.TOP)


with BuildPart() as f18_tool62_1:
    add(f18_tool62.part)

    # F18_t70: intersect F18_tool66
    add(f18_tool66.part, mode=Mode.INTERSECT)


with BuildPart() as f1_8:
    add(f1_7.part)

    # F18_t60: union F18_tool62
    add(f18_tool62_1.part)


with BuildPart() as f18_tool73:
    # F18_s74 → F18_t75 (revolve)
    with BuildSketch(Plane(origin=(0, 0, 0), x_dir=(0, 0, 1), z_dir=(-0.9646692497, -0.2634639231, 0))):
        Polygon((-25, 95.25), (-20, 100.25), (-20, 95.25), align=None)
    revolve(axis=Axis((0, 0, -20), (0, 0, -1)), revolution_arc=F18_T75_ANGLE)

    split(bisect_by=Plane.YZ.offset(-12.5), keep=Keep.BOTTOM)


with BuildPart() as f18_tool77:
    # F18_s78 → F18_t79 (new body)
    with BuildSketch(Plane.XY):
        with BuildLine():
            Line((-16.6271820449, 93.7875221831), (-12.5, 98.710751694))
            Line((-12.5, 98.710751694), (-12.5, 94.4262278183))
            ThreePointArc((-12.5, 94.4262278183), (-14.6414795672, 94.1179556519), (-16.6271820449, 93.7875221831))
        make_face()
    extrude(amount=-F18_T79_DEPTH)

    split(bisect_by=Plane.XY.offset(-20), keep=Keep.BOTTOM)


with BuildPart() as f18_tool73_1:
    add(f18_tool73.part)

    # F18_t81: intersect F18_tool77
    add(f18_tool77.part, mode=Mode.INTERSECT)


with BuildPart() as f1_9:
    add(f1_8.part)

    # F18_t71: union F18_tool73
    add(f18_tool73_1.part)


with BuildPart() as f18_tool84:
    # F18_s85 → F18_t86 (new body)
    with BuildSketch(Plane.XY):
        with BuildLine():
            Line((16.6271820449, 93.7875221831), (12.5, 98.710751694))
            Line((12.5, 98.710751694), (12.5, 94.4262278183))
            ThreePointArc((12.5, 94.4262278183), (14.6414795672, 94.1179556519), (16.6271820449, 93.7875221831))
        make_face()
    extrude(amount=-F18_T86_DEPTH)

    split(bisect_by=Plane.XY.offset(-20), keep=Keep.BOTTOM)


with BuildPart() as f18_tool88:
    # F18_s89 → F18_t90 (revolve)
    with BuildSketch(Plane(origin=(0, 0, 0), x_dir=(0, 0, 1), z_dir=(-0.9646692497, -0.2634639231, 0))):
        Polygon((-25, 95.25), (-20, 100.25), (-20, 95.25), align=None)
    revolve(axis=Axis((0, 0, -20), (0, 0, -1)), revolution_arc=F18_T90_ANGLE)

    split(bisect_by=Plane.YZ.offset(12.5), keep=Keep.TOP)


with BuildPart() as f18_tool84_1:
    add(f18_tool84.part)

    # F18_t92: intersect F18_tool88
    add(f18_tool88.part, mode=Mode.INTERSECT)


with BuildPart() as f1_10:
    add(f1_9.part)

    # F18_t82: union F18_tool84
    add(f18_tool84_1.part)


with BuildPart() as f18_tool95:
    # F18_s96 → F18_t97 (new body)
    with BuildSketch(Plane.XY.offset(11.0991303205)):
        with BuildLine():
            Line((-16.6271820449, 93.7875221831), (-12.5, 98.710751694))
            Line((-12.5, 98.710751694), (-12.5, 94.4262278183))
            ThreePointArc((-12.5, 94.4262278183), (-14.6414795672, 94.1179556519), (-16.6271820449, 93.7875221831))
        make_face()
    extrude(amount=-F18_T97_DEPTH)

    split(bisect_by=Plane.XY, keep=Keep.TOP)


with BuildPart() as f18_tool99:
    # F18_s100 → F18_t101 (revolve)
    with BuildSketch(Plane(origin=(0, 0, 0), x_dir=(0, 0, 1), z_dir=(-0.9646692497, -0.2634639231, 0))):
        Polygon((5, 95.25), (0, 100.25), (0, 95.25), align=None)
    revolve(axis=Axis((0, 0, 0), (0, 0, -1)), revolution_arc=F18_T101_ANGLE)

    split(bisect_by=Plane.YZ.offset(-12.5), keep=Keep.BOTTOM)


with BuildPart() as f18_tool95_1:
    add(f18_tool95.part)

    # F18_t103: intersect F18_tool99
    add(f18_tool99.part, mode=Mode.INTERSECT)


with BuildPart() as f1_11:
    add(f1_10.part)

    # F18_t93: union F18_tool95
    add(f18_tool95_1.part)


with BuildPart() as f18_tool106:
    # F18_s107 → F18_t108 (new body)
    with BuildSketch(Plane.XY.offset(11.0991303205)):
        with BuildLine():
            Line((16.6271820449, 93.7875221831), (12.5, 98.710751694))
            Line((12.5, 98.710751694), (12.5, 94.4262278183))
            ThreePointArc((12.5, 94.4262278183), (14.6414795672, 94.1179556519), (16.6271820449, 93.7875221831))
        make_face()
    extrude(amount=-F18_T108_DEPTH)

    split(bisect_by=Plane.XY, keep=Keep.TOP)


with BuildPart() as f18_tool110:
    # F18_s111 → F18_t112 (revolve)
    with BuildSketch(Plane(origin=(0, 0, 0), x_dir=(0, 0, 1), z_dir=(-0.9646692497, -0.2634639231, 0))):
        Polygon((5, 95.25), (0, 100.25), (0, 95.25), align=None)
    revolve(axis=Axis((0, 0, 0), (0, 0, -1)), revolution_arc=F18_T112_ANGLE)

    split(bisect_by=Plane.YZ.offset(12.5), keep=Keep.TOP)


with BuildPart() as f18_tool106_1:
    add(f18_tool106.part)

    # F18_t114: intersect F18_tool110
    add(f18_tool110.part, mode=Mode.INTERSECT)


with BuildPart() as f1_12:
    add(f1_11.part)

    # F18_t104: union F18_tool106
    add(f18_tool106_1.part)

    # F19 (on face) → F20 (cut)
    with BuildSketch(Plane.YZ.offset(12.5)):
        with Locations((149, -10)):
            Circle(F19_R)
        with Locations((-149, -10)):
            Circle(F19_R)
    extrude(amount=-F20_DEPTH, mode=Mode.SUBTRACT)

    # F22 (on mid) → F23 (cut, symmetric)
    with BuildSketch(Plane.YZ):
        with BuildLine():
            ThreePointArc((144.4594594595, -23.2432432432), (163, -10), (144.4594594595, 3.2432432432))
            Line((144.4594594595, 3.2432432432), (135, 0))
            Line((135, 0), (135, -20))
            Line((135, -20), (144.4594594595, -23.2432432432))
        make_face()
        with BuildLine():
            Line((-144.4594594595, -23.2432432432), (-135, -20))
            Line((-135, -20), (-135, 0))
            Line((-135, 0), (-144.4594594595, 3.2432432432))
            ThreePointArc((-144.4594594595, 3.2432432432), (-163, -10), (-144.4594594595, -23.2432432432))
        make_face()
    extrude(amount=F23_DEPTH, both=True, mode=Mode.SUBTRACT)


solid = Compound([f9.part, f1_12.part])
